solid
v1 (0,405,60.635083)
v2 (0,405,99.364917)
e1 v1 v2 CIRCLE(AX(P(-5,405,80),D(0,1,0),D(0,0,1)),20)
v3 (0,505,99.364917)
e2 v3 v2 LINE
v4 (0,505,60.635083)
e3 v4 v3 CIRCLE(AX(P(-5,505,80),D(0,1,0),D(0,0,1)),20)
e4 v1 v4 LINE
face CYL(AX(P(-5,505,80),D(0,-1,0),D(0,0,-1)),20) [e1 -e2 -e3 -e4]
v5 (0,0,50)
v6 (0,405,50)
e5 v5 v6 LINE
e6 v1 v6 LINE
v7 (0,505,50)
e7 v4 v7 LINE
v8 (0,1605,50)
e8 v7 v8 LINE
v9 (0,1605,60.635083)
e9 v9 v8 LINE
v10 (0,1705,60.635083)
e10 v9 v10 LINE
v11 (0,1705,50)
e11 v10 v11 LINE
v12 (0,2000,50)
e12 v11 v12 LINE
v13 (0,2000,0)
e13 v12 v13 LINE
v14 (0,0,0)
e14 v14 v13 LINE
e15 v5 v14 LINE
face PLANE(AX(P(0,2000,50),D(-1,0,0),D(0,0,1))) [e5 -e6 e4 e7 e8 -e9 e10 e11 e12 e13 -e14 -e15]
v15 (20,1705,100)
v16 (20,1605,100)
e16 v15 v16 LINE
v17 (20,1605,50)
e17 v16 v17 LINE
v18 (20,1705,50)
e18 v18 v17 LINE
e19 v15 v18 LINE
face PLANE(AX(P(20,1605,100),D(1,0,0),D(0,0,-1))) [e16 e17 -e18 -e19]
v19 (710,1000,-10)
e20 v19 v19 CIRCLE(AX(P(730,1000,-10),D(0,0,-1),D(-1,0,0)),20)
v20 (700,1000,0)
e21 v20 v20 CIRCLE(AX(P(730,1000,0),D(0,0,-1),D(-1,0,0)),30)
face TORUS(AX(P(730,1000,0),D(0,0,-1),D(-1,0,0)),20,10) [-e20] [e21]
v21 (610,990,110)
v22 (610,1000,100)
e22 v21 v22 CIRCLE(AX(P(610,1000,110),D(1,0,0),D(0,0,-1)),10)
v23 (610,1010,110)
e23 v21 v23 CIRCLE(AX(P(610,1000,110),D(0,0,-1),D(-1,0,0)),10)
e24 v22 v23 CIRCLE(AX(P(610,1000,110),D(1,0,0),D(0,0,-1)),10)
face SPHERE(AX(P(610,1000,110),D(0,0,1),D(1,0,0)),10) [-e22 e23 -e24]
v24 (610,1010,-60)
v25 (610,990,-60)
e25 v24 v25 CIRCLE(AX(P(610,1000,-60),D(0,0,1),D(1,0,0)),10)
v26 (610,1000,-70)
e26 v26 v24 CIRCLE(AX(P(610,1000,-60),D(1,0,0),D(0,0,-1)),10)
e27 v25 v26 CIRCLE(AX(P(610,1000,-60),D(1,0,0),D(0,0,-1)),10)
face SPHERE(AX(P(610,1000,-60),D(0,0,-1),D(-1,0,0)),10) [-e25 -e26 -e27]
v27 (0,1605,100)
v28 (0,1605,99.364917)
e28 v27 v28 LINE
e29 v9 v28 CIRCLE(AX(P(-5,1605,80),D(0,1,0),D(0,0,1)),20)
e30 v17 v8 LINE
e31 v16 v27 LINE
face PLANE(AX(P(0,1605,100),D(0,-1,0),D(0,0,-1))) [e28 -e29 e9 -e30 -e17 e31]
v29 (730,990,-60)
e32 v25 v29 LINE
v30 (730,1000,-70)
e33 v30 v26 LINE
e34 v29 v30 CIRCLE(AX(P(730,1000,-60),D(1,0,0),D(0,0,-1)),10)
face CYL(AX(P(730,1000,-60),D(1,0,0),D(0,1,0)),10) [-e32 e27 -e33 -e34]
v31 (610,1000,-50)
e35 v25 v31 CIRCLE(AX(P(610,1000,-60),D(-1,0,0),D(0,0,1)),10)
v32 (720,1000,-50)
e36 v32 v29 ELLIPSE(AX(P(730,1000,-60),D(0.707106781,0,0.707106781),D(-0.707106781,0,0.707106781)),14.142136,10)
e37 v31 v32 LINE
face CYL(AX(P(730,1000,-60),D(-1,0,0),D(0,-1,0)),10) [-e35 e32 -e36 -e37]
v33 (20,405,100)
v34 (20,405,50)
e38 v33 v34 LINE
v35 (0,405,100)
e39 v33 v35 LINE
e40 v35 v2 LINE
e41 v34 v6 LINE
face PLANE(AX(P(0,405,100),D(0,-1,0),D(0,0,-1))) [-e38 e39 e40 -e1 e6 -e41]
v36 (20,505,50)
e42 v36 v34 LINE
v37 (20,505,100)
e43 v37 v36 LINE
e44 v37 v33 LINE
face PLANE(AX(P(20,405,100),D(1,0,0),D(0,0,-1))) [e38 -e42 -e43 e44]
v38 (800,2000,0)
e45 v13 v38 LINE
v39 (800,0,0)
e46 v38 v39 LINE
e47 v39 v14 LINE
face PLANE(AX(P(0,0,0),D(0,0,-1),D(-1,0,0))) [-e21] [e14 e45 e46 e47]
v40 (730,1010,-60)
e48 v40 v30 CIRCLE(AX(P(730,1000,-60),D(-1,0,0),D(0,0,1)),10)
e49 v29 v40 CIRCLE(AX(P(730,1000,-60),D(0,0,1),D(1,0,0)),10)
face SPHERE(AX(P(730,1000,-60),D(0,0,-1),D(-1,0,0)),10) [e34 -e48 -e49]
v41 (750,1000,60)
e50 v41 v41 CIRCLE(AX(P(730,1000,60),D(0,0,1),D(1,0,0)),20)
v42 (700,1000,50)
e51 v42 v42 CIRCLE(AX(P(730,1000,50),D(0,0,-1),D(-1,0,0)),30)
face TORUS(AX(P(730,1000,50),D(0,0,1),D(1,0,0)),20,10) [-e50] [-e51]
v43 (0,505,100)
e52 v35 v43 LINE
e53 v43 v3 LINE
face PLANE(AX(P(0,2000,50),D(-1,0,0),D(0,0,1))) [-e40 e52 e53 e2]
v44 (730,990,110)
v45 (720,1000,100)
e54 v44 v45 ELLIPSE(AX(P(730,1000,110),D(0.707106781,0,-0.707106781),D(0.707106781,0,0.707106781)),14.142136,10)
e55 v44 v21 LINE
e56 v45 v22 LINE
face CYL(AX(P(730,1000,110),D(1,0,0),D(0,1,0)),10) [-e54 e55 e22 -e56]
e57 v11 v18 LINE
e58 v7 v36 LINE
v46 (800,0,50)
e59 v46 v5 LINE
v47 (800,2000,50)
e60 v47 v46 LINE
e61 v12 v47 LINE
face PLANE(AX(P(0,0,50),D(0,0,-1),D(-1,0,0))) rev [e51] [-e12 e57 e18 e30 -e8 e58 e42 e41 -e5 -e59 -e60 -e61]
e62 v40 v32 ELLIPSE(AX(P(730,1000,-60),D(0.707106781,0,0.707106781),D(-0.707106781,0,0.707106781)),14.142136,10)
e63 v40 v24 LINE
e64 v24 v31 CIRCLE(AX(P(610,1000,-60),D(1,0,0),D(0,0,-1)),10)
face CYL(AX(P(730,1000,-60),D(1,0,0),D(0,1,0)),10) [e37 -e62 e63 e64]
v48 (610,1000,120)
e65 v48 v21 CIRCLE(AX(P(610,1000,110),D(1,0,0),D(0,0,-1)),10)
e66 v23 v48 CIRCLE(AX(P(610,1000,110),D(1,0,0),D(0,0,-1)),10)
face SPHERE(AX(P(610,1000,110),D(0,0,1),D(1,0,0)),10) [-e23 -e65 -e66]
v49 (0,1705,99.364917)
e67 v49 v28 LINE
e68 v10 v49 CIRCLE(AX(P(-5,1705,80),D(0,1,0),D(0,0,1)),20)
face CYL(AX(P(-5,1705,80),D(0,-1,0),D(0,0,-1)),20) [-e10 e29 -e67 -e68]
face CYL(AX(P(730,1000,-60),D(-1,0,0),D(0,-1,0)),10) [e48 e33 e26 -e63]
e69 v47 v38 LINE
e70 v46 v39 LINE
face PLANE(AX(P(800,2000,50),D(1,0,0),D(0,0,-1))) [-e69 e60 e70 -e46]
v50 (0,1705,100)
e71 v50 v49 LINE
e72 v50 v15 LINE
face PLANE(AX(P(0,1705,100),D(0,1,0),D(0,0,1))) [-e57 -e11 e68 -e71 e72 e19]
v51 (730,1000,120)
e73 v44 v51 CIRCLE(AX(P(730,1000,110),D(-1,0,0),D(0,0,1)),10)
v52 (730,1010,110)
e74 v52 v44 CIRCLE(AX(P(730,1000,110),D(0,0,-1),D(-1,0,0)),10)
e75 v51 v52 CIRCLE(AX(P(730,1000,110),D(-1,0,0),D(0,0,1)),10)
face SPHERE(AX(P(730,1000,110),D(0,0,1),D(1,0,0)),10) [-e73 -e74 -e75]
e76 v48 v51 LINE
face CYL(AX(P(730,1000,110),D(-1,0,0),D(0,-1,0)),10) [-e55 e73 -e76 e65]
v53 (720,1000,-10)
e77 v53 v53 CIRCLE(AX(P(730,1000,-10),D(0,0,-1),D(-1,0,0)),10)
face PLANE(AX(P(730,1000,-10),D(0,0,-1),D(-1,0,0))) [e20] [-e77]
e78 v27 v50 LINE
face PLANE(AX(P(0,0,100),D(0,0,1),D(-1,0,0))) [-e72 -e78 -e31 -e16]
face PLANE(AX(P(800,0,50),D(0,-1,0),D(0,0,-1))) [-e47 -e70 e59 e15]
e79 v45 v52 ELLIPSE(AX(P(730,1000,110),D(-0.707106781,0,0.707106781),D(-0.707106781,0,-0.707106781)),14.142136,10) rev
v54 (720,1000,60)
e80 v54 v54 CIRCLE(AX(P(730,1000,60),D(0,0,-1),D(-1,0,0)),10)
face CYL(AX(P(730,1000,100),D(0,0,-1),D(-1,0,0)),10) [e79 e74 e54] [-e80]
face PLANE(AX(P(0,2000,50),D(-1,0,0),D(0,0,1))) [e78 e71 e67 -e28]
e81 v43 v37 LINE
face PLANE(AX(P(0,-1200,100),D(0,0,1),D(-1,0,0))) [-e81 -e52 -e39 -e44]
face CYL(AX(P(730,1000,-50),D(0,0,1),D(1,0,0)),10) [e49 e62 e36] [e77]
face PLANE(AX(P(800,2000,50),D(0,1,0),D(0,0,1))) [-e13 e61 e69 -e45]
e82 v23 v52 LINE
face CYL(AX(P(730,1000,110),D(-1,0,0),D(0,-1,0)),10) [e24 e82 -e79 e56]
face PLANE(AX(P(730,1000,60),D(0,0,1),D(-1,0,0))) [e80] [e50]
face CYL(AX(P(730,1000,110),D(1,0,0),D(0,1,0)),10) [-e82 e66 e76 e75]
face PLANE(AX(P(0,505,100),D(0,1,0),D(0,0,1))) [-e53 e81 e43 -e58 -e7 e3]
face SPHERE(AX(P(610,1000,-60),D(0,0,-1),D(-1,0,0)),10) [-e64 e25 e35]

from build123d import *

# Parameters (mm, degrees)
SKETCH_1_W               = 800
SKETCH_1_H               = 2000
EXTRUDE_1_DEPTH          = 50
SKETCH_2_W               = 20
SKETCH_2_H               = 100
EXTRUDE_2_DEPTH          = 50
SKETCH_3_R               = 20
EXTRUDE_3_DEPTH          = 100
PATTERN_LINEAR_1_COUNT   = 2
PATTERN_LINEAR_1_PITCH   = 1200
SKETCH_4_R               = 30
EXTRUDE_4_DEPTH          = 10
SKETCH_5_R               = 10
EXTRUDE_5_DEPTH          = 40
EXTRUDE_6_DEPTH          = 20
FILLET_1_R               = 10
MIRROR_START             = 610
MIRROR_1_DEPTH           = 120
MIRROR_2_COPY_1_SKETCH_W = 20
MIRROR_2_COPY_1_SKETCH_H = 100
MIRROR_2_COPY_1_DEPTH    = 50
MIRROR_2_COPY_2_SKETCH_R = 20
MIRROR_2_COPY_2_DEPTH    = 100
DELETE_START             = 405
DELETE_FACE_1_DEPTH      = 1300


with BuildPart() as part:
    # Эскиз1 → Бобышка-Вытянуть1 (new body)
    with BuildSketch(Plane(origin=(46095.73955041, 0, 0), x_dir=(-1, 0, 0), z_dir=(0, 0, -1))):
        with Locations((45695.73955041, 1000)):
            Rectangle(SKETCH_1_W, SKETCH_1_H)
    extrude(amount=-EXTRUDE_1_DEPTH)

    # Эскиз2 → Бобышка-Вытянуть2 (add)
    with BuildSketch(Plane(origin=(0, 0, 0), x_dir=(-1, 0, 0), z_dir=(0, 0, -1))):
        with Locations((-10, 1655)):
            Rectangle(SKETCH_2_W, SKETCH_2_H)
    extrude_2 = extrude(amount=EXTRUDE_2_DEPTH)

    # Эскиз3 → Бобышка-Вытянуть3 (add)
    with BuildSketch(Plane(origin=(0, 1605, 0), x_dir=(-1, 0, 0), z_dir=(0, -1, 0))):
        with Locations((5, 30)):
            Circle(SKETCH_3_R)
    extrude_3 = extrude(amount=-EXTRUDE_3_DEPTH)

    # Линейный массив1: Бобышка-Вытянуть2, Бобышка-Вытянуть3 ×2
    with Locations(*[(0, -i * PATTERN_LINEAR_1_PITCH, 0) for i in range(1, PATTERN_LINEAR_1_COUNT)]):
        add(extrude_2)
        add(extrude_3)

    # Эскиз4 → Бобышка-Вытянуть4 (add)
    with BuildSketch(Plane(origin=(0, 0, 0), x_dir=(-1, 0, 0), z_dir=(0, 0, -1))):
        with Locations((-730, 1000)):
            Circle(SKETCH_4_R)
    extrude(amount=EXTRUDE_4_DEPTH)

    # Эскиз5 → Бобышка-Вытянуть5 (add)
    with BuildSketch(Plane(origin=(0, 0, -10), x_dir=(-1, 0, 0), z_dir=(0, 0, -1))):
        with Locations((-730, 1000)):
            Circle(SKETCH_5_R)
    extrude(amount=EXTRUDE_5_DEPTH)

    # Эскиз6 → Бобышка-Вытянуть6 (add)
    with BuildSketch(Plane(origin=(0, 0, -50), x_dir=(-1, 0, 0), z_dir=(0, 0, -1))):
        with BuildLine():
            Line((-730, 1010), (-610, 1010))
            ThreePointArc((-610, 1010), (-600, 1000), (-610, 990))
            Line((-610, 990), (-730, 990))
            ThreePointArc((-730, 990), (-740, 1000), (-730, 1010))
        make_face()
    extrude(amount=EXTRUDE_6_DEPTH)

    # Скругление1
    # the kernel refuses this fillet: 10 mm, written as the material it takes off along each edge
    with BuildSketch(Plane(origin=(755, 1010, -50), x_dir=(0, -1, 0), z_dir=(-1, 0, 0))) as fillet_1_piece_1_section:
        with BuildLine():
            CenterArc((FILLET_1_R, -FILLET_1_R), FILLET_1_R, 90, 90)
            Line((0, -FILLET_1_R), (0, 0))
            Line((0, 0), (FILLET_1_R, 0))
        make_face()
    fillet_1_piece_1 = extrude(amount=145, mode=Mode.PRIVATE)
    fillet_1_piece_1 = fillet_1_piece_1 - Plane(origin=(730, 1000, -50), x_dir=(-1, 0, 0), z_dir=(0, 0, 1)) * Cylinder(10, 330, mode=Mode.PRIVATE)
    add(fillet_1_piece_1, mode=Mode.SUBTRACT)
    with BuildSketch(Plane(origin=(610, 1000, -50), x_dir=(0, 1, 0), z_dir=(1, 0, 0))) as fillet_1_piece_2:
        with BuildLine():
            CenterArc((10 - FILLET_1_R, -FILLET_1_R), FILLET_1_R, 0, 90)
            Line((10, -FILLET_1_R), (10, 0))
            Line((10, 0), (10 - FILLET_1_R, 0))
        make_face()
    revolve(axis=Axis((610, 1000, -50), (0, 0, 1)), revolution_arc=180, mode=Mode.SUBTRACT)
    with BuildSketch(Plane(origin=(730, 1010, -70), x_dir=(0, 0, 1), z_dir=(-1, 0, 0)), Plane(origin=(610, 990, -70), x_dir=(0, 0, 1), z_dir=(1, 0, 0))) as fillet_1_piece_3:
        with BuildLine():
            CenterArc((FILLET_1_R, -FILLET_1_R), FILLET_1_R, 90, 90)
            Line((0, -FILLET_1_R), (0, 0))
            Line((0, 0), (FILLET_1_R, 0))
        make_face()
    extrude(amount=120, mode=Mode.SUBTRACT)
    with BuildSketch(Plane(origin=(610, 1000, -70), x_dir=(0, 1, 0), z_dir=(1, 0, 0))) as fillet_1_piece_4:
        with BuildLine():
            CenterArc((10 - FILLET_1_R, FILLET_1_R), FILLET_1_R, 270, 90)
            Line((10 - FILLET_1_R, 0), (10, 0))
            Line((10, 0), (10, FILLET_1_R))
        make_face()
    revolve(axis=Axis((610, 1000, -70), (0, 0, 1)), revolution_arc=180, mode=Mode.SUBTRACT)
    with BuildSketch(Plane(origin=(730, 1000, -70), x_dir=(0, -1, 0), z_dir=(-1, 0, 0))) as fillet_1_piece_5:
        with BuildLine():
            CenterArc((10 - FILLET_1_R, FILLET_1_R), FILLET_1_R, 270, 90)
            Line((10 - FILLET_1_R, 0), (10, 0))
            Line((10, 0), (10, FILLET_1_R))
        make_face()
    revolve(axis=Axis((730, 1000, -70), (0, 0, 1)), revolution_arc=180, mode=Mode.SUBTRACT)
    with BuildSketch(Plane(origin=(730, 1000, -10), x_dir=(-1, 0, 0), z_dir=(0, -1, 0))) as fillet_1_piece_6:
        with BuildLine():
            CenterArc((30 - FILLET_1_R, -FILLET_1_R), FILLET_1_R, 0, 90)
            Line((30 - FILLET_1_R, 0), (30, 0))
            Line((30, 0), (30, -FILLET_1_R))
        make_face()
    revolve(axis=Axis((730, 1000, -10), (0, 0, -1)), mode=Mode.SUBTRACT)
    with BuildSketch(Plane(origin=(610, 990, -50), x_dir=(0, 1, 0), z_dir=(1, 0, 0))) as fillet_1_piece_7_section:
        with BuildLine():
            CenterArc((FILLET_1_R, -FILLET_1_R), FILLET_1_R, 90, 90)
            Line((0, -FILLET_1_R), (0, 0))
            Line((0, 0), (FILLET_1_R, 0))
        make_face()
    fillet_1_piece_7 = extrude(amount=145, mode=Mode.PRIVATE)
    fillet_1_piece_7 = fillet_1_piece_7 - Plane(origin=(730, 1000, -50), x_dir=(-1, 0, 0), z_dir=(0, 0, 1)) * Cylinder(10, 330, mode=Mode.PRIVATE)
    add(fillet_1_piece_7, mode=Mode.SUBTRACT)



with BuildPart() as body_2:
    # Зеркальное отражение1: read off the stored shape, not the designer's step
    # Зеркальное отражение1 outline → Зеркальное отражение1 (new body)
    with BuildSketch(Plane.YZ.offset(MIRROR_START)):
        with BuildLine():
            ThreePointArc((1000, 120), (992.928932188, 117.071067812), (990, 110))
            ThreePointArc((990, 110), (992.928932188, 102.928932188), (1000, 100))
            ThreePointArc((1000, 100), (1007.071067812, 102.928932188), (1010, 110))
            ThreePointArc((1010, 110), (1007.071067812, 117.071067812), (1000, 120))
        make_face()
    extrude(amount=MIRROR_1_DEPTH)


with BuildPart() as part_1:
    add(part.part)

    add(body_2.part)  # Mirror 1 2 merges body 2
    # Mirror 1 2 outline → Mirror 1 2 (revolve)
    with BuildSketch(Plane(origin=(730, 1000, 0), x_dir=(1, 0, 0), z_dir=(0, -1, 0))):
        with BuildLine():
            Line((10, 60), (10, 110))
            ThreePointArc((10, 110), (7.071067812, 117.071067812), (0, 120))
            Line((0, 120), (0, 50))
            Line((0, 50), (30, 50))
            ThreePointArc((30, 50), (27.071067812, 57.071067812), (20, 60))
            Line((20, 60), (10, 60))
        make_face()
    revolve(axis=Axis((730, 1000, 0), (0, 0, 1)))

    # Mirror 1 3 outline → Mirror 1 3 (revolve)
    with BuildSketch(Plane(origin=(0, 1000, 110), x_dir=(0, 1, 0), z_dir=(0, 0, -1))):
        with BuildLine():
            Line((0, 610), (0, 600))
            ThreePointArc((0, 600), (7.071067812, 602.928932188), (10, 610))
            Line((10, 610), (0, 610))
        make_face()
    revolve(axis=Axis((0, 1000, 110), (1, 0, 0)))

    # Зеркальное отражение2: Бобышка-Вытянуть2, Бобышка-Вытянуть3 across plane
    add(extrude_2.mirror(Plane(origin=(0, 0, 25), x_dir=(1, 0, 0), z_dir=(0, 0, -1))))
    add(extrude_3.mirror(Plane(origin=(0, 0, 25), x_dir=(1, 0, 0), z_dir=(0, 0, -1))))

    # Зеркальное отражение2 copy 1 sketch → Зеркальное отражение2 copy 1 (add)
    with BuildSketch(Plane(origin=(0, -1200, 50), x_dir=(-1, 0, 0), z_dir=(0, 0, 1))):
        with Locations((-10, -1655)):
            Rectangle(MIRROR_2_COPY_1_SKETCH_W, MIRROR_2_COPY_1_SKETCH_H)
    extrude(amount=MIRROR_2_COPY_1_DEPTH)

    # Зеркальное отражение2 copy 2 sketch → Зеркальное отражение2 copy 2 (add)
    with BuildSketch(Plane(origin=(0, 405, 50), x_dir=(-1, 0, 0), z_dir=(0, -1, 0))):
        with Locations((5, -30)):
            Circle(MIRROR_2_COPY_2_SKETCH_R)
    extrude(amount=-MIRROR_2_COPY_2_DEPTH)

    # Delete Face 1: read off the stored shape, not the designer's step
    # Delete Face 1 outline → Delete Face 1 (cut)
    with BuildSketch(Plane(origin=(0, 0, 0), x_dir=(1, 0, 0), z_dir=(0, 1, 0)).offset(DELETE_START)):
        with BuildLine():
            Line((20, 50), (0, 50))
            Line((0, 50), (0, 49.364916731))
            ThreePointArc((0, 49.364916731), (-25, 30), (0, 10.635083269))
            Line((0, 10.635083269), (0, 0))
            Line((0, 0), (20, 0))
            Line((20, 0), (20, 50))
        make_face()
    extrude(amount=DELETE_FACE_1_DEPTH, mode=Mode.SUBTRACT)


solid = part_1.part
